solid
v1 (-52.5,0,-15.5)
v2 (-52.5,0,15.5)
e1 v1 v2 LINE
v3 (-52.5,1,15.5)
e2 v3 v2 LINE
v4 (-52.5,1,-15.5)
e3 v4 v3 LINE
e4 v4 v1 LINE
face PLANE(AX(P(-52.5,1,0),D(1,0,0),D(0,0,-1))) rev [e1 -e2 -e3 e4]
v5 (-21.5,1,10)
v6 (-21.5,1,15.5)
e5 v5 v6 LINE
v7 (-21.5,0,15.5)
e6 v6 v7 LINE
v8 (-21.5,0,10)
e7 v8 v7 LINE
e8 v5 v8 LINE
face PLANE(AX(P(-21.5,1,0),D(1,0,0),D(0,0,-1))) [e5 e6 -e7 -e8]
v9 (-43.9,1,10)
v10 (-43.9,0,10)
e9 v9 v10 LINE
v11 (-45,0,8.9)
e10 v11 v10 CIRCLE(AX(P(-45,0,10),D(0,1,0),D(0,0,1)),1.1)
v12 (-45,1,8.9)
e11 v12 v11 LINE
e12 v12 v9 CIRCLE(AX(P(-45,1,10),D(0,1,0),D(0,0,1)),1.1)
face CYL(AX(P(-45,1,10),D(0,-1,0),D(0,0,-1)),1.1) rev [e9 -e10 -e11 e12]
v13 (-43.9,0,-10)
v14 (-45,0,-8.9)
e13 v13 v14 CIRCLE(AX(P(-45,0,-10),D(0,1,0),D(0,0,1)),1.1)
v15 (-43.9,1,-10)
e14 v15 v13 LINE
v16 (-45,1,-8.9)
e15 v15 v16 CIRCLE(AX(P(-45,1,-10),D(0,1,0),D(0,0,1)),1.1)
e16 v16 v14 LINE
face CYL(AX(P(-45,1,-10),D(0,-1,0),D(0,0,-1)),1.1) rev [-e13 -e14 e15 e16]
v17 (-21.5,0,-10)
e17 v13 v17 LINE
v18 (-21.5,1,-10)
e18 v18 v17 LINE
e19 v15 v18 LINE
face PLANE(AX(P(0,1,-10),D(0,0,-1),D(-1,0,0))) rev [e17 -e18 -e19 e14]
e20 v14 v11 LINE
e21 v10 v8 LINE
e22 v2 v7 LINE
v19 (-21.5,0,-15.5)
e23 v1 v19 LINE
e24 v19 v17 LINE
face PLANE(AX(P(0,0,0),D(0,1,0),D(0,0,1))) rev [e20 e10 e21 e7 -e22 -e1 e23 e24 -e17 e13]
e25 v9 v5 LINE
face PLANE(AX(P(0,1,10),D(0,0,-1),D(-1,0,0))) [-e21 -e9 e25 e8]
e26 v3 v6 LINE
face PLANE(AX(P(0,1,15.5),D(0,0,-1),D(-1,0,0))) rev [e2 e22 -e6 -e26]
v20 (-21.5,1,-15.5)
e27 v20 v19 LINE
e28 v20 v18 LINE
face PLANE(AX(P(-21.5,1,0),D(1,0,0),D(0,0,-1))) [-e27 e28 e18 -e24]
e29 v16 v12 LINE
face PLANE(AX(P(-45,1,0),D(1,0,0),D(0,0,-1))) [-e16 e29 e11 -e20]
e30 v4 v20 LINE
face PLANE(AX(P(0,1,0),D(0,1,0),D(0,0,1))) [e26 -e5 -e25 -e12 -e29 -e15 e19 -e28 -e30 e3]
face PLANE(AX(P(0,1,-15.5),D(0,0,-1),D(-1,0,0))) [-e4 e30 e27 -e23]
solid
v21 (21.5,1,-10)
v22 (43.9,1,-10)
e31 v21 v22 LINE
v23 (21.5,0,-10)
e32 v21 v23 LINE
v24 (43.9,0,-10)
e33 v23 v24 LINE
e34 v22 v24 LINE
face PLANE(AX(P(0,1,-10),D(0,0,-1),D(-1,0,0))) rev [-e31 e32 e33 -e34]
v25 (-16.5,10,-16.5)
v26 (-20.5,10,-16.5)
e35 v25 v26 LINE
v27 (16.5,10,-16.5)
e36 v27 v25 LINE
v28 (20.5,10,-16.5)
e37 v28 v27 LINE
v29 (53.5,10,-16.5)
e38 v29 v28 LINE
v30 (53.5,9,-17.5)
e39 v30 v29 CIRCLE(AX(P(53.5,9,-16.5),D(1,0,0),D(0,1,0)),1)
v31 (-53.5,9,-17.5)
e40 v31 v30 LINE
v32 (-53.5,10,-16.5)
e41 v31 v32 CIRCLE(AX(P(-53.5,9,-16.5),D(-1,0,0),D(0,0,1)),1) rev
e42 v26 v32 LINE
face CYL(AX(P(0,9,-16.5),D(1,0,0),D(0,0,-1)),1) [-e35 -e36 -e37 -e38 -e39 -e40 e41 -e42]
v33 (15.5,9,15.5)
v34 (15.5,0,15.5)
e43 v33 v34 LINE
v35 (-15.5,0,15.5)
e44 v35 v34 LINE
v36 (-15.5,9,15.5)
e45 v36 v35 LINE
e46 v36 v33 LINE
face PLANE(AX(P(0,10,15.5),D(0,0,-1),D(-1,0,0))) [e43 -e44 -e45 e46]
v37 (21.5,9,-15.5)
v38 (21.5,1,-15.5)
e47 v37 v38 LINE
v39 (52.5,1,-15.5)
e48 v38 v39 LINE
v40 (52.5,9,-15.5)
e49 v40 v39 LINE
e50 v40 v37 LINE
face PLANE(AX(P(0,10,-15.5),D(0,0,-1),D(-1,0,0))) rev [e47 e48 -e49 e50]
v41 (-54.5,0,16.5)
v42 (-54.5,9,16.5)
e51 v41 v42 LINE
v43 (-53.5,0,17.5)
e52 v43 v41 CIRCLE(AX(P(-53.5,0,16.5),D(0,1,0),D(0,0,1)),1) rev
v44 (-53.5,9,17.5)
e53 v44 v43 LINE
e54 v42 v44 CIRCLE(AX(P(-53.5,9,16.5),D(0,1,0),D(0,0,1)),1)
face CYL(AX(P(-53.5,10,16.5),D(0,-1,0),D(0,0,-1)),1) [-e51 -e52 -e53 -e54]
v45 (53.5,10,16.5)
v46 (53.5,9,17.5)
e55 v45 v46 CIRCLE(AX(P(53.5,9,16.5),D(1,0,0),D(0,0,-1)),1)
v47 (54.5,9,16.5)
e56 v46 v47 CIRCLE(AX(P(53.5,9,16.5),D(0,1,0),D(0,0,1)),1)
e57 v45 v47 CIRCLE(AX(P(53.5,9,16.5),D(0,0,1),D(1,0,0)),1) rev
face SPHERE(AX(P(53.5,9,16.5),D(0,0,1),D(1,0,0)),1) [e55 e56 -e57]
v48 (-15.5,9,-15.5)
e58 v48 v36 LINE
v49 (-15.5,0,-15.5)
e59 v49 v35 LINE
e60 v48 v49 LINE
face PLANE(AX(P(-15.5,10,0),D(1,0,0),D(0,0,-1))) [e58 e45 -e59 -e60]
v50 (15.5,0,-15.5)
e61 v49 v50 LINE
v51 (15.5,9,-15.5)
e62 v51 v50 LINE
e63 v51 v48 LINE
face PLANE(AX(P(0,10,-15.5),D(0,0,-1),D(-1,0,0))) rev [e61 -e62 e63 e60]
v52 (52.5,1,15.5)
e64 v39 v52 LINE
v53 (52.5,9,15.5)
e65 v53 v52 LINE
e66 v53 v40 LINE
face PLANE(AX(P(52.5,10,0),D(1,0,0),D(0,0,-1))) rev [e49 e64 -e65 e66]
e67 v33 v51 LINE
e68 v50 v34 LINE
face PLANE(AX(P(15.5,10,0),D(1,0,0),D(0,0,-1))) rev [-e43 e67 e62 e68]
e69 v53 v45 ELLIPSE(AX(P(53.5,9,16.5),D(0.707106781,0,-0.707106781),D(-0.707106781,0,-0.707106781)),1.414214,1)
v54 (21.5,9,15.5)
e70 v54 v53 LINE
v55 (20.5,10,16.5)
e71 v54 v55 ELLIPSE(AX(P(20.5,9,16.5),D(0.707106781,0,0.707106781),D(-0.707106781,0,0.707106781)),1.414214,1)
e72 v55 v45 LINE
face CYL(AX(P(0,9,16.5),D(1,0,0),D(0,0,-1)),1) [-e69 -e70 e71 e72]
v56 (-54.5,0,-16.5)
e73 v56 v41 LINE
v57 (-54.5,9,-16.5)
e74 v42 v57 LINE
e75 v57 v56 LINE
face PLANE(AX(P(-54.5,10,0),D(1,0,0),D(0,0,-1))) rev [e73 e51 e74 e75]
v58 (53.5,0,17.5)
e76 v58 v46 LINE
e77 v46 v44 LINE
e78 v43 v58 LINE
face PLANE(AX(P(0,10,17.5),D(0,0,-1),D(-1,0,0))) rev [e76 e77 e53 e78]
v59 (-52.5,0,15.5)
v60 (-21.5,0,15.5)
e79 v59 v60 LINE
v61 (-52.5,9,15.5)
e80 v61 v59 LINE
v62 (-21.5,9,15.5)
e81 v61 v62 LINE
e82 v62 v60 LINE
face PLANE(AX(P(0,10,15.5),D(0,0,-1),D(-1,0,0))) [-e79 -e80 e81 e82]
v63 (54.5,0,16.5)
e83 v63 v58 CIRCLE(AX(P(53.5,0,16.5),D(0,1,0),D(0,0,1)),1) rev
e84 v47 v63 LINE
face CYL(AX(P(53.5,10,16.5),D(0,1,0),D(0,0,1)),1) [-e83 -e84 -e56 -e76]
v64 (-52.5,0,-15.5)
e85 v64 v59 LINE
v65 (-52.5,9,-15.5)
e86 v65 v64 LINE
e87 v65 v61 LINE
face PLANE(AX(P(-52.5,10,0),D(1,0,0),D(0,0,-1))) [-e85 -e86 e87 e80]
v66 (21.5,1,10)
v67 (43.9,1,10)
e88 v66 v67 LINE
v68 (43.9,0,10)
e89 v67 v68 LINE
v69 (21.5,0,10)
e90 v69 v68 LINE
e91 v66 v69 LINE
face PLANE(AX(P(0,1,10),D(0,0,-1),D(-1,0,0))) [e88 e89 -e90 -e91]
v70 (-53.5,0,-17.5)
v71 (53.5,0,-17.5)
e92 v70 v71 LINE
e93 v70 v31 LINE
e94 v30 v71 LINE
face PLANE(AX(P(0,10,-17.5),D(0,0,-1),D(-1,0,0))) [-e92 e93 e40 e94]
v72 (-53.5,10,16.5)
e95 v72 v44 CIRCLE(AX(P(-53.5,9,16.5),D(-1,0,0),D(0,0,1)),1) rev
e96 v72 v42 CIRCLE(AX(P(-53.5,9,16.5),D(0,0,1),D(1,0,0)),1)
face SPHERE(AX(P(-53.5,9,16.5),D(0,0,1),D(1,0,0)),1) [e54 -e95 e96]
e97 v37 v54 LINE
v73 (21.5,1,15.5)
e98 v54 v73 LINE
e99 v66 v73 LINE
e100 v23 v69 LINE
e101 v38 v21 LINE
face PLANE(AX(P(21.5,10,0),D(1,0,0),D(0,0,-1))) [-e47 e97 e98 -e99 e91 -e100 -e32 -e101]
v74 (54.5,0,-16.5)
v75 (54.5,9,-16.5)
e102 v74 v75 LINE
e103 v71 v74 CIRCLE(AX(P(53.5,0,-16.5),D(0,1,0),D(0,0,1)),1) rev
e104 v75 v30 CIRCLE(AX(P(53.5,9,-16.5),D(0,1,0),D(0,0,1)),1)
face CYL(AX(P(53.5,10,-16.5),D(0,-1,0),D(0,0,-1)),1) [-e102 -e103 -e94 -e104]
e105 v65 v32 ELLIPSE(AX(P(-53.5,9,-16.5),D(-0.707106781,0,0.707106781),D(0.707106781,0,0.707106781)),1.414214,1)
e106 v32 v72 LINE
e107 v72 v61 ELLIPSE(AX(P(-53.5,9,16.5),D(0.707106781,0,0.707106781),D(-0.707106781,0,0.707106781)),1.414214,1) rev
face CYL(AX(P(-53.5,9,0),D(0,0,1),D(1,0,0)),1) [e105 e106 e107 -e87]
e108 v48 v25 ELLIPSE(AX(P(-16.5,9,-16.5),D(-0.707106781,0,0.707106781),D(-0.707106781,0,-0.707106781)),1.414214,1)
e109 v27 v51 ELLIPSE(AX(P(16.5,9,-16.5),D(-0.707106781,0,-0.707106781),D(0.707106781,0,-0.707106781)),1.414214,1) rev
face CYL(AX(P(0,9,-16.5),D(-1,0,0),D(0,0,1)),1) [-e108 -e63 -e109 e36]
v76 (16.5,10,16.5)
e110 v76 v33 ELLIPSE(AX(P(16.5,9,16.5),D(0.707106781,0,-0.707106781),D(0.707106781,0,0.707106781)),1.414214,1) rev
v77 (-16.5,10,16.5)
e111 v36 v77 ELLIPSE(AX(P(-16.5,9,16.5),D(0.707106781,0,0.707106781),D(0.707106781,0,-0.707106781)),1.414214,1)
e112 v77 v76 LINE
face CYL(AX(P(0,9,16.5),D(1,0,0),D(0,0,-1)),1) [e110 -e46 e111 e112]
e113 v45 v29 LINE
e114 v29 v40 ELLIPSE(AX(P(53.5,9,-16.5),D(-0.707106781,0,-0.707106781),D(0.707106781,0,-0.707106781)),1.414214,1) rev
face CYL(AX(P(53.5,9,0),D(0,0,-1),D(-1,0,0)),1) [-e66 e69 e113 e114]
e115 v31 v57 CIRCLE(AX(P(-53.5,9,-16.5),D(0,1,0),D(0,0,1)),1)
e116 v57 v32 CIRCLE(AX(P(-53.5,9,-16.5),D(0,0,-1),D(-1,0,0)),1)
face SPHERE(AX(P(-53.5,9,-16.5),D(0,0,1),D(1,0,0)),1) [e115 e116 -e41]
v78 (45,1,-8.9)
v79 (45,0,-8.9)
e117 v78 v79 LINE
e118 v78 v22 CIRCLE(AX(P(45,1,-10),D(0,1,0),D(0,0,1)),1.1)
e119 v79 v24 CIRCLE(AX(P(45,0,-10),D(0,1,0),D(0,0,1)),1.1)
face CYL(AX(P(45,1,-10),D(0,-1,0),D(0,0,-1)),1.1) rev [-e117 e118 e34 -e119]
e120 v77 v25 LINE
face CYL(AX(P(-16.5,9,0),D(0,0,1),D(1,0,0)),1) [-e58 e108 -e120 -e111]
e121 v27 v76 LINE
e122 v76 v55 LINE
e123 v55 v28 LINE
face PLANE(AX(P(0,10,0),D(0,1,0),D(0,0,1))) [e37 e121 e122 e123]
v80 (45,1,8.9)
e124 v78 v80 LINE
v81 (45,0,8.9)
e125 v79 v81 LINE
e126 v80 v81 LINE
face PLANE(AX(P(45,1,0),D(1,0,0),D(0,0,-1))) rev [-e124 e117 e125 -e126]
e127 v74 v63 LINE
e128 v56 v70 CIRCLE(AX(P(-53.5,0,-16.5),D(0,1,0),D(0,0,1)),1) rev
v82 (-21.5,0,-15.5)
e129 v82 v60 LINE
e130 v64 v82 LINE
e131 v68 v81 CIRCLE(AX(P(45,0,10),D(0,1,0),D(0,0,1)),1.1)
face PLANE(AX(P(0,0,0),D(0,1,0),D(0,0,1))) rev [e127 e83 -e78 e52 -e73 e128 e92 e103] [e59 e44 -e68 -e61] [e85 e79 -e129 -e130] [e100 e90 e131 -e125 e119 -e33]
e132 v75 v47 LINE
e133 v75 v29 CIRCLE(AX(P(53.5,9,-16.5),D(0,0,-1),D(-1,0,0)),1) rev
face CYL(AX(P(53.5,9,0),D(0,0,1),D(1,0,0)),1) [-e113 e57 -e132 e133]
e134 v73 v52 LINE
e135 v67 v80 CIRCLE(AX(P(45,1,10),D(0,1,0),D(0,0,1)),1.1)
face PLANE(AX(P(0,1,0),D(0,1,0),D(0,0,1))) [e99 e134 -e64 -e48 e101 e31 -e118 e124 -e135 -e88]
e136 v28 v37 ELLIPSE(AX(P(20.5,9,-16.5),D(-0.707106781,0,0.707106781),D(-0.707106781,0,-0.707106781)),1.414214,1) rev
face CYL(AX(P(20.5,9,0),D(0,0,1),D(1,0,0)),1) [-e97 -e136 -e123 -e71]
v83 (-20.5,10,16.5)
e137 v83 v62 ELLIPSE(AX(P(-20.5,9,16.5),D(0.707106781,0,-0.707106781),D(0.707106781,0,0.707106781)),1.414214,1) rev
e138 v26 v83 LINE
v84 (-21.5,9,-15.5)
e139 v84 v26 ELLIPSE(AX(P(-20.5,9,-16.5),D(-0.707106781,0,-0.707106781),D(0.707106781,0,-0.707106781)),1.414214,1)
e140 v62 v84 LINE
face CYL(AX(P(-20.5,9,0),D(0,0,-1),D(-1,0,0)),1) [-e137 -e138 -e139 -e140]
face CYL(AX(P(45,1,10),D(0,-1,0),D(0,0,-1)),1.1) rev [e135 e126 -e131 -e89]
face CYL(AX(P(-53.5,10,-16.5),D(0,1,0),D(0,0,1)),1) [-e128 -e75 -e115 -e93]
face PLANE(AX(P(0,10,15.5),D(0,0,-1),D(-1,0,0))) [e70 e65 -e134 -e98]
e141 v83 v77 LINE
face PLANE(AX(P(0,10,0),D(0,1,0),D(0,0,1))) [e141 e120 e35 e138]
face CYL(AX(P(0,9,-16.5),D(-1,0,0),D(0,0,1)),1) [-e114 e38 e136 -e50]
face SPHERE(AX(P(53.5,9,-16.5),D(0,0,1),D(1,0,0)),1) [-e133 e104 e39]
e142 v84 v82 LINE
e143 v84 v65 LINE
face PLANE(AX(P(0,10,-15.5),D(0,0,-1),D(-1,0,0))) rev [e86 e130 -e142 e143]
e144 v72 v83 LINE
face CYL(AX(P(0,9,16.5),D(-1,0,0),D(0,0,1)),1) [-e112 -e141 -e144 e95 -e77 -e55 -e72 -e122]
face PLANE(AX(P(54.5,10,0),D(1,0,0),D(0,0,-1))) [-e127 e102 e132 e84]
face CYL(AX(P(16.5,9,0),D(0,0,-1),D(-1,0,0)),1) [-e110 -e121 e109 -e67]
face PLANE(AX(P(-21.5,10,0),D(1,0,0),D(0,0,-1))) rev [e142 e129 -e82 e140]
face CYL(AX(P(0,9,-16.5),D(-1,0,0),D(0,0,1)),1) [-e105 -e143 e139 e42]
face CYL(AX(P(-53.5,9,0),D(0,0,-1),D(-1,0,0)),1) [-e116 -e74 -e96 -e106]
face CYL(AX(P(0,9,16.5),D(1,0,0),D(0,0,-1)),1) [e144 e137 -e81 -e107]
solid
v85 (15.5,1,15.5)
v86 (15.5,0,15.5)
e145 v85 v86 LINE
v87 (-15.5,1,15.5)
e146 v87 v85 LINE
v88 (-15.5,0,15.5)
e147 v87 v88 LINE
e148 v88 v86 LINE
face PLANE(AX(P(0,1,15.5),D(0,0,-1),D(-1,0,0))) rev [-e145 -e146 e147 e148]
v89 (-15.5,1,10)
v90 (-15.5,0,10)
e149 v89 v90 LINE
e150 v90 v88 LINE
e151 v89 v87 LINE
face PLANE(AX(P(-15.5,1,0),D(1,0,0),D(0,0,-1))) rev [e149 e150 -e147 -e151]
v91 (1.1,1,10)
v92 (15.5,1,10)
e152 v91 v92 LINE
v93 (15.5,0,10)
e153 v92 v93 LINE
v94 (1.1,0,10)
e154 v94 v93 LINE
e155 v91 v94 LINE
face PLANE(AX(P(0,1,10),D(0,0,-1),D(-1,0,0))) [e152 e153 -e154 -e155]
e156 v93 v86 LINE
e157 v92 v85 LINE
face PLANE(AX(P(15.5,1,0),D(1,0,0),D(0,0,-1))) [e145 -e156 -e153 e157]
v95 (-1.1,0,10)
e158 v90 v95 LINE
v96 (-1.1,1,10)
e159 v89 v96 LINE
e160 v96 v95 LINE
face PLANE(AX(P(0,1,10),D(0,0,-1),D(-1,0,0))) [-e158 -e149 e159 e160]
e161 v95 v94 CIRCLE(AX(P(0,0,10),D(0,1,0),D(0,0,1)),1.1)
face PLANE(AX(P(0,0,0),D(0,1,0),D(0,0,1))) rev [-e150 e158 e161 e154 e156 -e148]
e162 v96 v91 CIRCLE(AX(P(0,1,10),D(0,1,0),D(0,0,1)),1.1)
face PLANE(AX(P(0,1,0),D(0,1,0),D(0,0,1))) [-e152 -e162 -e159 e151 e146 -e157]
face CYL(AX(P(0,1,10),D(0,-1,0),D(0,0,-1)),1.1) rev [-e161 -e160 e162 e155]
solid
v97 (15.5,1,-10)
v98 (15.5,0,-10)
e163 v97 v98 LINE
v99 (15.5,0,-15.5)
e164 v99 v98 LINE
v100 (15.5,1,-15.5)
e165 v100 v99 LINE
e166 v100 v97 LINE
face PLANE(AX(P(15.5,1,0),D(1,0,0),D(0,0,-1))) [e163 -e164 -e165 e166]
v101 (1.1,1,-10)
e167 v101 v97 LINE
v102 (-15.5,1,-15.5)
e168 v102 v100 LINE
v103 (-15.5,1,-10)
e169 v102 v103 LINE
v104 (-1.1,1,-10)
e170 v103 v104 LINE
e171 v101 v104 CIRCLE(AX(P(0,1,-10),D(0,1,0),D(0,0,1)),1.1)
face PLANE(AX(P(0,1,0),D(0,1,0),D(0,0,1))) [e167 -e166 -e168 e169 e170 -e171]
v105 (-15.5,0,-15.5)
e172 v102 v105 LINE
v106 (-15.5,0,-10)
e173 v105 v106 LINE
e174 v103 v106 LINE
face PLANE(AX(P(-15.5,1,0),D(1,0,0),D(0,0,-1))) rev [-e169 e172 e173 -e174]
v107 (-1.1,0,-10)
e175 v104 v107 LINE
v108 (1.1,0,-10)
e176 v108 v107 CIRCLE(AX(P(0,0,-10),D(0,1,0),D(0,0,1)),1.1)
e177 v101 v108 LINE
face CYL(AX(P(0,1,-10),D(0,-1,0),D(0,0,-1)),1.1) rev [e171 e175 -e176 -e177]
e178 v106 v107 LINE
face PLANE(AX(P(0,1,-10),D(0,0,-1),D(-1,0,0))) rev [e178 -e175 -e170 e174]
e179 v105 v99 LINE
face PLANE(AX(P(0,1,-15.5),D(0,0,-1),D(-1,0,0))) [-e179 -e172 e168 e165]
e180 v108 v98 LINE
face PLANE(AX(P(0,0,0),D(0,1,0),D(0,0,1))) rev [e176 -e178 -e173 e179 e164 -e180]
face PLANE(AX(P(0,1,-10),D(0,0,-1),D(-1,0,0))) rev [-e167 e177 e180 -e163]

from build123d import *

# Parameters (mm, degrees)
EXTRUDE_1_DEPTH   = 1
EXTRUDE_1_2_DEPTH = 1
EXTRUDE_1_3_DEPTH = 1
EXTRUDE_1_4_DEPTH = 1
SKETCH_1_3_W      = 109
SKETCH_1_3_H      = 35
SKETCH_1_3_W_2    = 105
SKETCH_1_3_H_2    = 31
SKETCH_1_3_W_3    = 6
SKETCH_1_3_H_3    = 20
SKETCH_1_3_H_4    = 5.5
EXTRUDE_2_DEPTH   = 10
FILLET_1_R        = 1
FILLET_2_R        = 1


with BuildPart() as part:
    # 草图1 → 凸台-拉伸1 (new body)
    with BuildSketch(Plane(origin=(0, 0, 0), x_dir=(1, 0, 0), z_dir=(0, 1, 0))):
        with BuildLine():
            Line((-21.5, 10), (-21.5, 15.5))
            Line((-21.5, 15.5), (-52.5, 15.5))
            Line((-52.5, 15.5), (-52.5, -15.5))
            Line((-52.5, -15.5), (-21.5, -15.5))
            Line((-21.5, -15.5), (-21.5, -10))
            Line((-21.5, -10), (-43.9, -10))
            ThreePointArc((-43.9, -10), (-45.777817459, -10.777817459), (-45, -8.9))
            Line((-45, -8.9), (-45, 8.9))
            ThreePointArc((-45, 8.9), (-45.777817459, 10.777817459), (-43.9, 10))
            Line((-43.9, 10), (-21.5, 10))
        make_face()
    extrude(amount=EXTRUDE_1_DEPTH)


with BuildPart() as body_2:
    # 草图1 → Extrude 1 2 (new body)
    with BuildSketch(Plane(origin=(0, 0, 0), x_dir=(1, 0, 0), z_dir=(0, 1, 0))):
        with BuildLine():
            Line((-1.1, -10), (-15.5, -10))
            Line((-15.5, -10), (-15.5, -15.5))
            Line((-15.5, -15.5), (15.5, -15.5))
            Line((15.5, -15.5), (15.5, -10))
            Line((15.5, -10), (1.1, -10))
            ThreePointArc((1.1, -10), (0, -11.1), (-1.1, -10))
        make_face()
    extrude(amount=EXTRUDE_1_2_DEPTH)


with BuildPart() as body_3:
    # 草图1 → Extrude 1 3 (new body)
    with BuildSketch(Plane(origin=(0, 0, 0), x_dir=(1, 0, 0), z_dir=(0, 1, 0))):
        with BuildLine():
            Line((15.5, 15.5), (-15.5, 15.5))
            Line((-15.5, 15.5), (-15.5, 10))
            Line((-15.5, 10), (-1.1, 10))
            ThreePointArc((-1.1, 10), (0, 11.1), (1.1, 10))
            Line((1.1, 10), (15.5, 10))
            Line((15.5, 10), (15.5, 15.5))
        make_face()
    extrude(amount=EXTRUDE_1_3_DEPTH)


with BuildPart() as body_4:
    # 草图1 → Extrude 1 4 (new body)
    with BuildSketch(Plane(origin=(0, 0, 0), x_dir=(1, 0, 0), z_dir=(0, 1, 0))):
        with BuildLine():
            Line((52.5, 15.5), (21.5, 15.5))
            Line((21.5, 15.5), (21.5, 10))
            Line((21.5, 10), (43.9, 10))
            ThreePointArc((43.9, 10), (45, 11.1), (46.1, 10))
            ThreePointArc((46.1, 10), (45.777817459, 9.222182541), (45, 8.9))
            Line((45, 8.9), (45, -8.9))
            ThreePointArc((45, -8.9), (45.777817459, -9.222182541), (46.1, -10))
            ThreePointArc((46.1, -10), (45, -11.1), (43.9, -10))
            Line((43.9, -10), (21.5, -10))
            Line((21.5, -10), (21.5, -15.5))
            Line((21.5, -15.5), (52.5, -15.5))
            Line((52.5, -15.5), (52.5, 15.5))
        make_face()
    extrude(amount=EXTRUDE_1_4_DEPTH)

    # 草图1<3> → 凸台-拉伸2 (add)
    # profile 1 of 7: a face of its own
    with BuildSketch(Plane(origin=(0, 0, 0), x_dir=(1, 0, 0), z_dir=(0, 1, 0))):
        Rectangle(SKETCH_1_3_W, SKETCH_1_3_H)
        Rectangle(SKETCH_1_3_W_2, SKETCH_1_3_H_2, mode=Mode.SUBTRACT)
    # profile 2 of 7: a face of its own
    with BuildSketch(Plane(origin=(0, 0, 0), x_dir=(1, 0, 0), z_dir=(0, 1, 0))):
        with Locations((-18.5, 0)):
            Rectangle(SKETCH_1_3_W_3, SKETCH_1_3_H_3)
    # profile 3 of 7: a face of its own
    with BuildSketch(Plane(origin=(0, 0, 0), x_dir=(1, 0, 0), z_dir=(0, 1, 0))):
        with Locations((18.5, 0)):
            Rectangle(SKETCH_1_3_W_3, SKETCH_1_3_H_3)
    # profile 4 of 7: a face of its own
    with BuildSketch(Plane(origin=(0, 0, 0), x_dir=(1, 0, 0), z_dir=(0, 1, 0))):
        with Locations((-18.5, 12.75)):
            Rectangle(SKETCH_1_3_W_3, SKETCH_1_3_H_4)
    # profile 5 of 7: a face of its own
    with BuildSketch(Plane(origin=(0, 0, 0), x_dir=(1, 0, 0), z_dir=(0, 1, 0))):
        with Locations((-18.5, -12.75)):
            Rectangle(SKETCH_1_3_W_3, SKETCH_1_3_H_4)
    # profile 6 of 7: a face of its own
    with BuildSketch(Plane(origin=(0, 0, 0), x_dir=(1, 0, 0), z_dir=(0, 1, 0))):
        with Locations((18.5, 12.75)):
            Rectangle(SKETCH_1_3_W_3, SKETCH_1_3_H_4)
    # profile 7 of 7: a face of its own
    with BuildSketch(Plane(origin=(0, 0, 0), x_dir=(1, 0, 0), z_dir=(0, 1, 0))):
        with Locations((18.5, -12.75)):
            Rectangle(SKETCH_1_3_W_3, SKETCH_1_3_H_4)
    extrude(amount=EXTRUDE_2_DEPTH)

    # 圆角1
    fillet_1_edges = [body_4.edges().sort_by_distance(p)[0] for p in [
        (0, 10, -17.5),
        (54.5, 5, -17.5),
        (-54.5, 5, -17.5),
        (-54.5, 5, 17.5),
        (54.5, 10, 0),
        (54.5, 5, 17.5),
        (-54.5, 10, 0),
        (0, 10, 17.5),
    ]]
    fillet(fillet_1_edges, radius=FILLET_1_R)

    # 圆角2
    fillet_2_edges = [body_4.edges().sort_by_distance(p)[0] for p in [
        (21.5, 10, 0),
        (-37, 10, 15.5),
        (37, 10, 15.5),
        (-15.5, 10, 0),
        (-52.5, 10, 0),
        (0, 10, 15.5),
        (0, 10, -15.5),
        (15.5, 10, 0),
        (37, 10, -15.5),
        (52.5, 10, 0),
        (-37, 10, -15.5),
        (-21.5, 10, 0),
    ]]
    fillet(fillet_2_edges, radius=FILLET_2_R - 0.0001)  # a hair under: the kernel refuses the full size


solid = Compound([part.part, body_2.part, body_3.part, body_4.part])
